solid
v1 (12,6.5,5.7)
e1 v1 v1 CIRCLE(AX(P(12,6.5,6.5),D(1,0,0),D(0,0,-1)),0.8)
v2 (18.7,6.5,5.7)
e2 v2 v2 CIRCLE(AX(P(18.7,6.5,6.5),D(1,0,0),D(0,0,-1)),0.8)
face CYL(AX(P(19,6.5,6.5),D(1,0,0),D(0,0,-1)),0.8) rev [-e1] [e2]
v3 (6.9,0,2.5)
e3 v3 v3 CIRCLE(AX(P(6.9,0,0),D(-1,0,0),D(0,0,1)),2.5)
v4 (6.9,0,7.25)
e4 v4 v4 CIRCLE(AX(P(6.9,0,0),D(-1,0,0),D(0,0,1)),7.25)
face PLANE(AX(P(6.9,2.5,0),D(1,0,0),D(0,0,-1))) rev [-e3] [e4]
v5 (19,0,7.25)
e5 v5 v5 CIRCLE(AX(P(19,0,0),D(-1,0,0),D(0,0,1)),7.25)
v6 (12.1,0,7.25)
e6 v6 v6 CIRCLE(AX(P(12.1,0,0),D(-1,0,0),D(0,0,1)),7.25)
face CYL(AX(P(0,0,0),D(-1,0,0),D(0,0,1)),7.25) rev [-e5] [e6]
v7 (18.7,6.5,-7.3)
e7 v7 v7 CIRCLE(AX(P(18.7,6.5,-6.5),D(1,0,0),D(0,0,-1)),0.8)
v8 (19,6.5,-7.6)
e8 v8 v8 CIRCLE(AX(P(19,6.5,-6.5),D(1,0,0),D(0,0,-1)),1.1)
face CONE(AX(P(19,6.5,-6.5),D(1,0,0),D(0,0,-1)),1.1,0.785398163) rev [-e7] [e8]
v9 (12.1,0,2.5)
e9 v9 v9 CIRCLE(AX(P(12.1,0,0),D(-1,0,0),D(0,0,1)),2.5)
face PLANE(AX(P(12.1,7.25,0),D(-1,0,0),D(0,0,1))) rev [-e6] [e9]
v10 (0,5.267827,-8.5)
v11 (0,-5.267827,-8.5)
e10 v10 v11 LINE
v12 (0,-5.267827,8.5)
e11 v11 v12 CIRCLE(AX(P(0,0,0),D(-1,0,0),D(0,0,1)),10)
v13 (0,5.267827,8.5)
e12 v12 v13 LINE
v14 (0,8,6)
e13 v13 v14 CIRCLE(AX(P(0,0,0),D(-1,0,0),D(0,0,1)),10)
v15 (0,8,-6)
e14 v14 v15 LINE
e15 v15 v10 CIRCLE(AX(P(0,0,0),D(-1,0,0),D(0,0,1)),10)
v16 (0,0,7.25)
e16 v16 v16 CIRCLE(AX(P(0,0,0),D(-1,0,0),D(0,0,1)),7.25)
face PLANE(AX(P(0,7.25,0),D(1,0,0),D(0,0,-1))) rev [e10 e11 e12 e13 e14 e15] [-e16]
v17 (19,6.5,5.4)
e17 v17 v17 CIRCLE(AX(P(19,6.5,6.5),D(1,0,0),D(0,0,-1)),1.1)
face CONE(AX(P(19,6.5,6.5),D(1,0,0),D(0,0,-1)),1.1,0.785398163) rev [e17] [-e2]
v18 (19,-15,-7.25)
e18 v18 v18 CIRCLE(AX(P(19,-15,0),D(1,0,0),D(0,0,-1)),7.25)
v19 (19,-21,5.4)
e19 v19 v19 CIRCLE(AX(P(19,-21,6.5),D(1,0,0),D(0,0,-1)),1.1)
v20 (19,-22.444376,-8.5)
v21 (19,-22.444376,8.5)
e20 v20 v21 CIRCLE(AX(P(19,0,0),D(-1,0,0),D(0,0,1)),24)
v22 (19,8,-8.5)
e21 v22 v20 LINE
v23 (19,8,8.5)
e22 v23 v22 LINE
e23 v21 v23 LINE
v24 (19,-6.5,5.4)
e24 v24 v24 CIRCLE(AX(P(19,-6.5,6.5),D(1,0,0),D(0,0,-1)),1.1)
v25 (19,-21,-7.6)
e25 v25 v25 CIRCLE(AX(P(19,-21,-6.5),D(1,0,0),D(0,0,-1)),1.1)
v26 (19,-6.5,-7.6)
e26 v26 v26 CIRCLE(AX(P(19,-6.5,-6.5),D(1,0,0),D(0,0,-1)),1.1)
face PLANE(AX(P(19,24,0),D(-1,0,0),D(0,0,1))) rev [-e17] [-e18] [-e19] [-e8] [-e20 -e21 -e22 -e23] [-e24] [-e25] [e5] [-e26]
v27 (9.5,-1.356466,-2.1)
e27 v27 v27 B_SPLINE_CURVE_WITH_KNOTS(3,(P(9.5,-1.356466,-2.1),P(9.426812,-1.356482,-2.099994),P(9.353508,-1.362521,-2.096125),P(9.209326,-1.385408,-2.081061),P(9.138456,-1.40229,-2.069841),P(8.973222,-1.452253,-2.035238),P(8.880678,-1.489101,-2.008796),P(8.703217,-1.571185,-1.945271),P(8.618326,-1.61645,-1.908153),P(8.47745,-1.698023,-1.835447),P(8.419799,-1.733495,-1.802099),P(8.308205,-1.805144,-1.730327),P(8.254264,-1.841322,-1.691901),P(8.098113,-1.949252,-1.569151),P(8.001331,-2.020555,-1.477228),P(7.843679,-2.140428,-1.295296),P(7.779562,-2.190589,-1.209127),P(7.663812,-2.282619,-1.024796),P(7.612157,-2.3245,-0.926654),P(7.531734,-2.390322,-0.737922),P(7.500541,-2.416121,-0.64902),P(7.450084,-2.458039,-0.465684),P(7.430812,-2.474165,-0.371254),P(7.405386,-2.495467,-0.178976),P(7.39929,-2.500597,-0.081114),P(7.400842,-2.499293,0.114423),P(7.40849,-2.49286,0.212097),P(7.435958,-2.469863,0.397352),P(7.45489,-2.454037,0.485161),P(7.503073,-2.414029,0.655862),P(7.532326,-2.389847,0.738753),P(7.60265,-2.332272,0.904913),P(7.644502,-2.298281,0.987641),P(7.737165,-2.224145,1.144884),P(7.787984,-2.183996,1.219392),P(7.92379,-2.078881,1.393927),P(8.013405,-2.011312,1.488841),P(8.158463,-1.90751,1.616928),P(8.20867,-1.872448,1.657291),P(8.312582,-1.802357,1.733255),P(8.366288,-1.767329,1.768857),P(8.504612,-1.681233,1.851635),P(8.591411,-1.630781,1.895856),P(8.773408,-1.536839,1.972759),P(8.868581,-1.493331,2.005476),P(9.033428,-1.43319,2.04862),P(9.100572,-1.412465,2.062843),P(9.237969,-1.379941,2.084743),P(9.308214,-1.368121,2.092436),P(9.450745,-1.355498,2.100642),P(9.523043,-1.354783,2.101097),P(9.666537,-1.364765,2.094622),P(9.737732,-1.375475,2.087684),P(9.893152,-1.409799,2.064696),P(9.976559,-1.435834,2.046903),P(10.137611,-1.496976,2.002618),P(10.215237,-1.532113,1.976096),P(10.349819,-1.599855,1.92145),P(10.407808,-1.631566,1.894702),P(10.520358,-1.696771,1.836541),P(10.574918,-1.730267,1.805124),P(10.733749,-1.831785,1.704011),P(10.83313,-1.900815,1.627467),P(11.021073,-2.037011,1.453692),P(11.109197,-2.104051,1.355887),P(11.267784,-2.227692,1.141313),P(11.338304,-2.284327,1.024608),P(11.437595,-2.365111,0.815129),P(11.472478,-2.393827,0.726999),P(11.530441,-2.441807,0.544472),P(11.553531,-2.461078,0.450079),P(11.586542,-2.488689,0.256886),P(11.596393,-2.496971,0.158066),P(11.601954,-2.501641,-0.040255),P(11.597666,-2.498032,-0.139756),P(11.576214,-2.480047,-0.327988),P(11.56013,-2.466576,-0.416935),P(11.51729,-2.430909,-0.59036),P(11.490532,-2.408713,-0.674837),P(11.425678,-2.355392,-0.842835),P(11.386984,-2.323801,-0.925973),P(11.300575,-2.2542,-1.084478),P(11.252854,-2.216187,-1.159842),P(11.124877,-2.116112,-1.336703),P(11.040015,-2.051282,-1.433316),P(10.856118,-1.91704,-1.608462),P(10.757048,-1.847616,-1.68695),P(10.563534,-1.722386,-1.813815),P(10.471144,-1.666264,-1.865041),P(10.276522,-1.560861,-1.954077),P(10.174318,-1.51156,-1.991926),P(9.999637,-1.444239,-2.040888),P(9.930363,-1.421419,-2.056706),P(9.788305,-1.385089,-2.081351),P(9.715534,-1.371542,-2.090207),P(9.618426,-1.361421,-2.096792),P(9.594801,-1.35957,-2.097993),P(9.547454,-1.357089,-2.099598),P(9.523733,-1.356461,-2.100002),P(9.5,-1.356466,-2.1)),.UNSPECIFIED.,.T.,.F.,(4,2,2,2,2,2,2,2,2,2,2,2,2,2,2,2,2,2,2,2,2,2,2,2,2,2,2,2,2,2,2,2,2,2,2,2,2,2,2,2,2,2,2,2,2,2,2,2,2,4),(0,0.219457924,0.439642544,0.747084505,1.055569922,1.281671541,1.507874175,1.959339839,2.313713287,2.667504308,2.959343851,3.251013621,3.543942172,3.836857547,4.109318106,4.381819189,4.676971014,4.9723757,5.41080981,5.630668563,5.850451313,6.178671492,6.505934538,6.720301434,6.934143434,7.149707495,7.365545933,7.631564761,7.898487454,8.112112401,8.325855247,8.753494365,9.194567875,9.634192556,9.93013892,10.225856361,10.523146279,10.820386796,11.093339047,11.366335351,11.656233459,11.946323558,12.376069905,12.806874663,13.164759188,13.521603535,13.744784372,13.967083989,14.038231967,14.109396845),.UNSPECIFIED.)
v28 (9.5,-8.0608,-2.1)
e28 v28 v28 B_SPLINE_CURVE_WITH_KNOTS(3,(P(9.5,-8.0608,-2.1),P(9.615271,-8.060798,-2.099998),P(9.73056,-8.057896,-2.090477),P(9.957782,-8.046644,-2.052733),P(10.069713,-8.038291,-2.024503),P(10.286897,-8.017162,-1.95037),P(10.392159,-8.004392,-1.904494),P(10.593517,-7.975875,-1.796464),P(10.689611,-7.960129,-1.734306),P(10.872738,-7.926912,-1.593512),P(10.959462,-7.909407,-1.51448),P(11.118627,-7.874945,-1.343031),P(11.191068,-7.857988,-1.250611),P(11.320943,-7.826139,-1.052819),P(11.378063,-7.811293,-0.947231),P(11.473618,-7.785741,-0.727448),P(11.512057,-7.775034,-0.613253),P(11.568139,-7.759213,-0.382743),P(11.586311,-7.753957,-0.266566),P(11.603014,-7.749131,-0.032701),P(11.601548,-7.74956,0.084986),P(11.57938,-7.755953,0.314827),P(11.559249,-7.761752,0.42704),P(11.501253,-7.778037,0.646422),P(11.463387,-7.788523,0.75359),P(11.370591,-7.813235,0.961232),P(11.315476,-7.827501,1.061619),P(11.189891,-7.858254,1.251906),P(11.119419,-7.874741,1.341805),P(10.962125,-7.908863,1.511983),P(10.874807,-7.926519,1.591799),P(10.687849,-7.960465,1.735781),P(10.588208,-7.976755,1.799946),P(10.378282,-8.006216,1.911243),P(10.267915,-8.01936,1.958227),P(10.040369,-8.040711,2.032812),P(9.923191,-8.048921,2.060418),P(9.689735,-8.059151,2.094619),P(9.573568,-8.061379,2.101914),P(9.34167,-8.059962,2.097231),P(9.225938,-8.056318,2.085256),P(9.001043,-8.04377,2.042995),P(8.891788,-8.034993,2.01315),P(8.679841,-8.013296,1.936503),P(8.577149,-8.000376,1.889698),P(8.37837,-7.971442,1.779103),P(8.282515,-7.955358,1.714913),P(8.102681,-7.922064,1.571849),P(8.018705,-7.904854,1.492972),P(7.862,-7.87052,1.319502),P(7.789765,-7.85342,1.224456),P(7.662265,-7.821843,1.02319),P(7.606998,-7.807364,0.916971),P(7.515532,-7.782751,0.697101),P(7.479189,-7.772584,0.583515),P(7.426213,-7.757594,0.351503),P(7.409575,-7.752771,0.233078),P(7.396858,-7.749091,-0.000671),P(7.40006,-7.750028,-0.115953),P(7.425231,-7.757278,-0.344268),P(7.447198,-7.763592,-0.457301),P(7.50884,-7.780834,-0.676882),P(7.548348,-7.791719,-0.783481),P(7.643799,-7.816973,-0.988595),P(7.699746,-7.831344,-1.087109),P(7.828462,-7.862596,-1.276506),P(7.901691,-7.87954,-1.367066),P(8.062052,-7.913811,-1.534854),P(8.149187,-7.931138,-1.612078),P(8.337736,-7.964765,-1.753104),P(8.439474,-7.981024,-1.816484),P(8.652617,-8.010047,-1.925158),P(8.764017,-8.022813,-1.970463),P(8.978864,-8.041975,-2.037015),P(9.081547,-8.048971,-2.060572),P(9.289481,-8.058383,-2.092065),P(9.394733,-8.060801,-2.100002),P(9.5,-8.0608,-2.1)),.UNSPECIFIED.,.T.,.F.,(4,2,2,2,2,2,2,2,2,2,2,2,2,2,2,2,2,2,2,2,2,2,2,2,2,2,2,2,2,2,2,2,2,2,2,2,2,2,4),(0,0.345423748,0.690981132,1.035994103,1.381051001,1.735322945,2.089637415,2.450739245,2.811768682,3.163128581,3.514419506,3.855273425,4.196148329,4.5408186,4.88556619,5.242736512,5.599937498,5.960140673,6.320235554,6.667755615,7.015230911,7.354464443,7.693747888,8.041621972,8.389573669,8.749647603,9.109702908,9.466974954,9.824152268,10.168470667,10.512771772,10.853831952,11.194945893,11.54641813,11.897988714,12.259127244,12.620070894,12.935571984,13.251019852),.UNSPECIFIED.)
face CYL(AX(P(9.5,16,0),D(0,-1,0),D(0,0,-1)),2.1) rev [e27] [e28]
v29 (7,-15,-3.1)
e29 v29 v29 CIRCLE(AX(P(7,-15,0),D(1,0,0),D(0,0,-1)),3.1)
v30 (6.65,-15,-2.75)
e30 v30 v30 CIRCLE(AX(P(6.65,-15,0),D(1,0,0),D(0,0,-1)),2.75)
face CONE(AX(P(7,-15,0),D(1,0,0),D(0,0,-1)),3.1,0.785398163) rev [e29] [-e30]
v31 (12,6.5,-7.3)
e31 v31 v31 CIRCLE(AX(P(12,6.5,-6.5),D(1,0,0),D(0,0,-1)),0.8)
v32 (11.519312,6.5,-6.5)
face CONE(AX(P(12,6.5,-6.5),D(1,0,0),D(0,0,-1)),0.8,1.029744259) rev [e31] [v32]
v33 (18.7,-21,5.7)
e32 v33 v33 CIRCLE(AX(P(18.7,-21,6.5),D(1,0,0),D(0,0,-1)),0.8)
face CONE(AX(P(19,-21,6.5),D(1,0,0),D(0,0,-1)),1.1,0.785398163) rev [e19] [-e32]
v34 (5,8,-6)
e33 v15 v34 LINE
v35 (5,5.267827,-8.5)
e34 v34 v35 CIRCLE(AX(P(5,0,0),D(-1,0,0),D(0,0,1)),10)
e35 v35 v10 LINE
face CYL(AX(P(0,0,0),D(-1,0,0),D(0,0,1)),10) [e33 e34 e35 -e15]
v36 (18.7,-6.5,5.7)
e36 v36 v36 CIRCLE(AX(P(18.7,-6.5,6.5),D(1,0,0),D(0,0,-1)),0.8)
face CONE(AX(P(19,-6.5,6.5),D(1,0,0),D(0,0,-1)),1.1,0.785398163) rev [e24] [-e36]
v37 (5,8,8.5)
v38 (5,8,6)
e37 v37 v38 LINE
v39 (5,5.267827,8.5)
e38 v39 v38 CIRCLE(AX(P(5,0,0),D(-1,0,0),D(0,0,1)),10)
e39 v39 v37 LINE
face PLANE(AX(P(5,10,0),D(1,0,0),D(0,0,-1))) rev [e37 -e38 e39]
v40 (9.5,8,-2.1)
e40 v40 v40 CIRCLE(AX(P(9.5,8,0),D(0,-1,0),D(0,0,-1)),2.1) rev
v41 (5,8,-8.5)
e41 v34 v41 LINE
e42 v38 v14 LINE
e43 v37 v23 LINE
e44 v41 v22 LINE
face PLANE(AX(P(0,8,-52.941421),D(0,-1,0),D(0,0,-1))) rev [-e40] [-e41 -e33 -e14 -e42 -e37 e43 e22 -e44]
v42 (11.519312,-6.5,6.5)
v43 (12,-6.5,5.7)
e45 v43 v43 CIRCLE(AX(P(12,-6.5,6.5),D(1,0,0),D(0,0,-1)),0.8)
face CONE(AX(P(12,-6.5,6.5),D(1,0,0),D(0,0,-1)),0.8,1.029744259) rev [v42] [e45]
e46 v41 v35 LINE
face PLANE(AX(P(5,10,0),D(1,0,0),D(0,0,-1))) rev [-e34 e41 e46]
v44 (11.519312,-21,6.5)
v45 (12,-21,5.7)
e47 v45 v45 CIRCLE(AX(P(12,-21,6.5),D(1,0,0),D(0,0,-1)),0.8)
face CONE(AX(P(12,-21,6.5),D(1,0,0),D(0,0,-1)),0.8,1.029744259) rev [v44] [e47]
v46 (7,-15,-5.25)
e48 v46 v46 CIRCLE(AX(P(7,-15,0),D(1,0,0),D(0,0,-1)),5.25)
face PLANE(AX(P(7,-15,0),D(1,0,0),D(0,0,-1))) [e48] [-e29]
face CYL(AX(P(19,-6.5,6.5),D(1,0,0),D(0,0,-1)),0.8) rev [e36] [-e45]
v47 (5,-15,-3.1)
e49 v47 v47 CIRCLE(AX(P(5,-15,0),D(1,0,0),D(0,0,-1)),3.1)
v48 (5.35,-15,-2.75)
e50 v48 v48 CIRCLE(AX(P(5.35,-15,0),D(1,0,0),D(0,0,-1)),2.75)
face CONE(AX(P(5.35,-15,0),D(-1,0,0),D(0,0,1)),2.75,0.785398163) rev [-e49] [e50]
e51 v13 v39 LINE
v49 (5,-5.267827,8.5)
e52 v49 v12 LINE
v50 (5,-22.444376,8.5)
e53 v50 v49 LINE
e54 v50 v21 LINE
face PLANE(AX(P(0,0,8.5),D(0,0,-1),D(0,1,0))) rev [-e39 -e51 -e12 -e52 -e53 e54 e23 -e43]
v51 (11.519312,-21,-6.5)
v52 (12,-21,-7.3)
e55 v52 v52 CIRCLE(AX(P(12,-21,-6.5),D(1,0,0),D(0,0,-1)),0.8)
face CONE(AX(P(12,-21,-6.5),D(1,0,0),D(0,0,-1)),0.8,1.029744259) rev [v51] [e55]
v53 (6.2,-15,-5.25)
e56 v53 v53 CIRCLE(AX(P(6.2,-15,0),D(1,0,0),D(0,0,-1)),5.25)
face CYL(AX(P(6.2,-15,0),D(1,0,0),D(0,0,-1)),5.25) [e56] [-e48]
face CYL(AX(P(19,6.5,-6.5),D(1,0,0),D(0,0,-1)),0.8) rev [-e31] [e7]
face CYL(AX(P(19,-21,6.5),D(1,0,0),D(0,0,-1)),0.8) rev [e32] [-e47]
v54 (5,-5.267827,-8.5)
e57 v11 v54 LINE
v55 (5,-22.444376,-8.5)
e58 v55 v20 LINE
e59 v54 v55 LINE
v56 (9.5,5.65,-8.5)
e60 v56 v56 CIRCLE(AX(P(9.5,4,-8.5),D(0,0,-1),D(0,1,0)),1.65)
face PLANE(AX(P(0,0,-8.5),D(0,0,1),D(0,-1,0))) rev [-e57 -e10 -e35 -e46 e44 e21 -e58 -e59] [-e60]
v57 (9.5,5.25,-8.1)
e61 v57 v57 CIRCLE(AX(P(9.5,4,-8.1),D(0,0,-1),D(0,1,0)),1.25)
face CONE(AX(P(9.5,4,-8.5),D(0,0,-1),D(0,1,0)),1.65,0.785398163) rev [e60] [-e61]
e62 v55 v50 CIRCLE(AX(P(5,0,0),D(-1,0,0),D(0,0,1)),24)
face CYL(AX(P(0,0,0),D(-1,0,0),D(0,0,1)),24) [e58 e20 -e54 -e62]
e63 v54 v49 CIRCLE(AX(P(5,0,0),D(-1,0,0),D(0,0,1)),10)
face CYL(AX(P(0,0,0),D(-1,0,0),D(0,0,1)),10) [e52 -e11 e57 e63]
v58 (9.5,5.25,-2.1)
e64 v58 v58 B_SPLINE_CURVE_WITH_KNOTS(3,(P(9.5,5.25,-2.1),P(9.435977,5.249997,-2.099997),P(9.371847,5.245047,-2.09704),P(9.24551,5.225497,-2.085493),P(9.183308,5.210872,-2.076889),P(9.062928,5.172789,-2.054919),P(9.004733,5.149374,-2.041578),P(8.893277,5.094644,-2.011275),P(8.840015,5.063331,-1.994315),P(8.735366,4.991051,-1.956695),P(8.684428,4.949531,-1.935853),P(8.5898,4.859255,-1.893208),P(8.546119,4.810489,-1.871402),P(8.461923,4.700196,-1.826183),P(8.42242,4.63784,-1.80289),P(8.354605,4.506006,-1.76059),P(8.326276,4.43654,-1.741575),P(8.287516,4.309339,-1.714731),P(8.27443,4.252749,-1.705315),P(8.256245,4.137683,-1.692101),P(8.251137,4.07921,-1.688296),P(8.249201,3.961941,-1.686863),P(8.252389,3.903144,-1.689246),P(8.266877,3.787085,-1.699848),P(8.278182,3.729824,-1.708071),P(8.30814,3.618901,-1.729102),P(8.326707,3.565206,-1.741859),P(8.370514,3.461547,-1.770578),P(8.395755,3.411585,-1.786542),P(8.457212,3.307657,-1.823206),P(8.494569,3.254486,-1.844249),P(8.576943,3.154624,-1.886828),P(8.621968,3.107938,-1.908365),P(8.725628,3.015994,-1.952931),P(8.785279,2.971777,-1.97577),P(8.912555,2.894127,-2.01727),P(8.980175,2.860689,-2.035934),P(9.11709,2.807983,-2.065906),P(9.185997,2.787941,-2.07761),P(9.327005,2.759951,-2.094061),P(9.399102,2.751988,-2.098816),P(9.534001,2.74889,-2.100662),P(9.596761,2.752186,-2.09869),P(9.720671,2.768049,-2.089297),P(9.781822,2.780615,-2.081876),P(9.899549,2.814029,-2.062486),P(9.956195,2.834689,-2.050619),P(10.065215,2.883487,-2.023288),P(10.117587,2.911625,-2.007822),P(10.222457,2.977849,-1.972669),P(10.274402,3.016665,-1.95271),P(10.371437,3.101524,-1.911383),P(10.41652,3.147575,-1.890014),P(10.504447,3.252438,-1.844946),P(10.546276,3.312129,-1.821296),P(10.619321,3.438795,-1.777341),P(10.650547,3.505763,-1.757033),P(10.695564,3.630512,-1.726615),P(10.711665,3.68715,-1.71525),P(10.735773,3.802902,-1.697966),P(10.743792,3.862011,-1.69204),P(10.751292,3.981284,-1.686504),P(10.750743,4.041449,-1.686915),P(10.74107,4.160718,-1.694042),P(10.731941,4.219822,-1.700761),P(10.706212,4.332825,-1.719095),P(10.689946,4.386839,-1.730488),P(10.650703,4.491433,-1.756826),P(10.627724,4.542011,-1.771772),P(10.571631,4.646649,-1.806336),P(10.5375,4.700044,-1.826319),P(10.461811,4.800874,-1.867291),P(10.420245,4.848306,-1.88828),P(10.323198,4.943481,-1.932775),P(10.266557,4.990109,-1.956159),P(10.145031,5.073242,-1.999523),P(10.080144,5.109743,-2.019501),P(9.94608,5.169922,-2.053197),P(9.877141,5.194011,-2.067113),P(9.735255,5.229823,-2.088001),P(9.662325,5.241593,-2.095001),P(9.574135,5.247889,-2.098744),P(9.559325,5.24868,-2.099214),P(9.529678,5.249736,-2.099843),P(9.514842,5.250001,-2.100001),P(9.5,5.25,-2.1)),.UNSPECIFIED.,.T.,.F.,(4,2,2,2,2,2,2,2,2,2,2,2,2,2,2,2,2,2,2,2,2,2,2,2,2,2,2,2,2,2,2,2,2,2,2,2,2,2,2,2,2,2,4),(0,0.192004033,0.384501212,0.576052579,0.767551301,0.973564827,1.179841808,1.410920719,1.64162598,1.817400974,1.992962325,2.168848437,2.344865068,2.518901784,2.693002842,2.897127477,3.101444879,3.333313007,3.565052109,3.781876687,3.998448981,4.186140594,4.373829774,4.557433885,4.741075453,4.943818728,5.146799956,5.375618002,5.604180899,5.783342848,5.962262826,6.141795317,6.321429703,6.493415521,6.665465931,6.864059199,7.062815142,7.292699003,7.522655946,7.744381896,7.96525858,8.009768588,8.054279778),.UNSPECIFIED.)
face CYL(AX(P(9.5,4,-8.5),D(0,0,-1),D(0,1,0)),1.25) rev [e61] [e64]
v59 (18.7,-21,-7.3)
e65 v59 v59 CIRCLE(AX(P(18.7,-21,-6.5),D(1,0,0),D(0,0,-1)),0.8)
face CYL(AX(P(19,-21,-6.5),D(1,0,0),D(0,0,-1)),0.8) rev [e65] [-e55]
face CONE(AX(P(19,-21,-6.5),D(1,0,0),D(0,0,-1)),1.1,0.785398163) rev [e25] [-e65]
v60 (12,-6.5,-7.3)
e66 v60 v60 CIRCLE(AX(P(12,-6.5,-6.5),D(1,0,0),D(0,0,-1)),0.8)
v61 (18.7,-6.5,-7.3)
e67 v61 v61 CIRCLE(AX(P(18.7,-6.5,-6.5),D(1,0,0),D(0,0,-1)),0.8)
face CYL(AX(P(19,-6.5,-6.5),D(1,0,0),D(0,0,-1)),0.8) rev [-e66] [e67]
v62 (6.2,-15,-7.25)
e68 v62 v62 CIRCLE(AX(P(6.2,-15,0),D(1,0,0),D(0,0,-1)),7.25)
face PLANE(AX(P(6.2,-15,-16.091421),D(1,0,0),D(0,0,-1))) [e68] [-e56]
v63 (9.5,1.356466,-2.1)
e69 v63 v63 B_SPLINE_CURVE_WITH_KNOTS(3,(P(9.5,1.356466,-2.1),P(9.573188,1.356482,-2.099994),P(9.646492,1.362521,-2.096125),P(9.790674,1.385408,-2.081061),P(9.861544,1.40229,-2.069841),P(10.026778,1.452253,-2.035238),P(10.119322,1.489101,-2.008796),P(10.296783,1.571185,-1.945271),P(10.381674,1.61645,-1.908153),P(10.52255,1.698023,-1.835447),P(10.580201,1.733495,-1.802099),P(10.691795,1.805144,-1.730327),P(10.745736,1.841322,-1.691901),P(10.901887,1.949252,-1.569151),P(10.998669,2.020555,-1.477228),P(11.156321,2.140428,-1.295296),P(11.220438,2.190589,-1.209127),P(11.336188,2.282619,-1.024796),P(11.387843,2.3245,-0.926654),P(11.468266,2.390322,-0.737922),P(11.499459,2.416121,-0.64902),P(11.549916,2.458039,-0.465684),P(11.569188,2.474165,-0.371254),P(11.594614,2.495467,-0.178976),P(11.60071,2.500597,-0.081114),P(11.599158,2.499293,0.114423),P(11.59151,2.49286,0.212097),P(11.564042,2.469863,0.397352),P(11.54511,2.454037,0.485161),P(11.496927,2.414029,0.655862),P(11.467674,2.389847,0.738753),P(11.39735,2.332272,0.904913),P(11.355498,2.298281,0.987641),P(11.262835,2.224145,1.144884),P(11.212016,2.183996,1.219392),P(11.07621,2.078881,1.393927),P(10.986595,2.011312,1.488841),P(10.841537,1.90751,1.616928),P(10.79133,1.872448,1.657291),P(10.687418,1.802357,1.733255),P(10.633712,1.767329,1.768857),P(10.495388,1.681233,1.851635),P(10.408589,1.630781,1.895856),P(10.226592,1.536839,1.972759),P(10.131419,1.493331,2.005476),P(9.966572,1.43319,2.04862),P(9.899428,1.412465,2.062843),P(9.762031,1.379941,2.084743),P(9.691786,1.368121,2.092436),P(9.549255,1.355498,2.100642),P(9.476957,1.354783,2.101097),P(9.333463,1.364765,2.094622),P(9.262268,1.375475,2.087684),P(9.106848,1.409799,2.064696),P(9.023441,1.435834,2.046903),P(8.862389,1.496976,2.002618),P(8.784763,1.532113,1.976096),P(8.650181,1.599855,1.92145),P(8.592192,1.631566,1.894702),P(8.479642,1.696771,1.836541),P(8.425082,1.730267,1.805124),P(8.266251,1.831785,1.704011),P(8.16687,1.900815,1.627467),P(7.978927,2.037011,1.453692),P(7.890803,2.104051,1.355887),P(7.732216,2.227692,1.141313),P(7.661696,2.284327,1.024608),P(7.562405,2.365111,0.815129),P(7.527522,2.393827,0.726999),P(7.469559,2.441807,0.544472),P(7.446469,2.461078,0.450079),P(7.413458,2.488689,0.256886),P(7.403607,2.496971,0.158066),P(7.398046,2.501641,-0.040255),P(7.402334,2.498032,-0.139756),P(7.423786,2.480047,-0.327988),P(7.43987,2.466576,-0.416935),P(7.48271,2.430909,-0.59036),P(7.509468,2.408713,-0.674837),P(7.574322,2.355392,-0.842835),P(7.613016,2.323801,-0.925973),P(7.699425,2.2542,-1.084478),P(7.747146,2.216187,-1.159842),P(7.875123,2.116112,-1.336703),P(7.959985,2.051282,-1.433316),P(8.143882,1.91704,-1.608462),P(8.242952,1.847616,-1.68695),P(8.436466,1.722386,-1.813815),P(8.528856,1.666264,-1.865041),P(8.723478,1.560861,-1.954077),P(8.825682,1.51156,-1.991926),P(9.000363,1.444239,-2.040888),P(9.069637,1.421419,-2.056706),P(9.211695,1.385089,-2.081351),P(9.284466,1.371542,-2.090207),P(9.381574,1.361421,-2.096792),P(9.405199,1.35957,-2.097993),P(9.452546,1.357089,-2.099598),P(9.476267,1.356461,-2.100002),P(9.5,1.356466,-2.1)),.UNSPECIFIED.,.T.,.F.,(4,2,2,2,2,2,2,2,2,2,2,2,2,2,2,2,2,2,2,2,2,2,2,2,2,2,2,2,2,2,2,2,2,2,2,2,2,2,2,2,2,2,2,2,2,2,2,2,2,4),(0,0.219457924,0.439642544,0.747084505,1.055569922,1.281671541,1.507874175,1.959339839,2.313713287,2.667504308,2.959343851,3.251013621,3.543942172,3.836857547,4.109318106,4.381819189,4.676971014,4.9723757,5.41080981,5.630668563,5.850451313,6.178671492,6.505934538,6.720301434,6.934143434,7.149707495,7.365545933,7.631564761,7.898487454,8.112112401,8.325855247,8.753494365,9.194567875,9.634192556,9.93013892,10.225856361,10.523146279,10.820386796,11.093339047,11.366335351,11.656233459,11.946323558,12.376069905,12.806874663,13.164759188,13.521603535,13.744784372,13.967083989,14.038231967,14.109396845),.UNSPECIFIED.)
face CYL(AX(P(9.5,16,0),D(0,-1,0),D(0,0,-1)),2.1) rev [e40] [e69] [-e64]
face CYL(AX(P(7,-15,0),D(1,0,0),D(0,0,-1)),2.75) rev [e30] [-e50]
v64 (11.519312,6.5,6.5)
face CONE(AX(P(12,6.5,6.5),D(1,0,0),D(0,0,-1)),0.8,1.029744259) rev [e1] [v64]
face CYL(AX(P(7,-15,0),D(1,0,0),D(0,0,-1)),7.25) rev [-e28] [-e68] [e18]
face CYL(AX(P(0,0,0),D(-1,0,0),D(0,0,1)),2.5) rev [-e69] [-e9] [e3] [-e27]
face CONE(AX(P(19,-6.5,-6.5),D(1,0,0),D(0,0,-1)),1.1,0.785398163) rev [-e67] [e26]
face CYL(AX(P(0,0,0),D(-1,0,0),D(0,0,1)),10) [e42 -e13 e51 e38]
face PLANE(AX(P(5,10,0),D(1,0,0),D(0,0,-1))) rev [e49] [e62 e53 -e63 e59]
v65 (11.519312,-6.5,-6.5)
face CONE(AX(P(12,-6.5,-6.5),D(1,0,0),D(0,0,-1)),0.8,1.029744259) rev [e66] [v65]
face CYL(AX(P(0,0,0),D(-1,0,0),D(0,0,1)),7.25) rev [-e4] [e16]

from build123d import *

# Parameters (mm, degrees)
SKETCH_3_R               = 7.25
CUT_EXTRUDE_1_DEPTH      = 12
CUT_EXTRUDE_3_DEPTH      = 39.897300678
CUT_EXTRUDE_2_DEPTH      = 16
CUT_EXTRUDE_2_DEPTH_BACK = 10
SKETCH_4_R               = 2.1
M2X0_41_D                = 1.6
M2X0_41_DEPTH            = 7
M2X0_41_CSINK_D          = 2.2
M2X0_41_CSINK_ANGLE      = 90
M2X0_41_TIP              = 0.480688495
SKETCH_12_R              = 7.25
SKETCH_12_R_2            = 5.25
CUT_EXTRUDE_4_DEPTH      = 0.8


# Read off the part's stored shape, not the designer's step: Отверстие обработанное метчиком M3x0.51
with BuildPart() as part:
    # Эскиз2 → Повернуть1 (revolve)
    with BuildSketch(Plane.XY, mode=Mode.PRIVATE) as revolve_1_sk:
        Polygon((0, 10), (5, 10), (5, 24), (19, 24), (19, 7.25), (12.1, 7.25), (12.1, 2.5), (6.9, 2.5), (6.9, 7.25), (0, 7.25), align=None)
    revolve(revolve_1_sk.sketch.rotate(Axis((0, 0, 0), (1, 0, 0)), 90), axis=Axis((0, 0, 0), (1, 0, 0)))

    # Эскиз3 → Вырез-Вытянуть1 (cut)
    with BuildSketch(Plane(origin=(19, 0, 0), x_dir=(0, 0, -1), z_dir=(1, 0, 0))):
        with Locations((0, -15)):
            Circle(SKETCH_3_R)
    extrude(amount=-CUT_EXTRUDE_1_DEPTH, mode=Mode.SUBTRACT)

    # Эскиз5 → Вырез-Вытянуть3 (cut, through all)
    with BuildSketch(Plane(origin=(19, 0, 0), x_dir=(0, 0, -1), z_dir=(1, 0, 0))):
        with BuildLine():
            ThreePointArc((24, 0), (-13.638181697, 19.748417658), (-8.5, -22.444375687))
            Line((-8.5, -22.444375687), (-8.5, 8))
            Line((-8.5, 8), (8.5, 8))
            Line((8.5, 8), (8.5, -22.444375687))
            ThreePointArc((8.5, -22.444375687), (19.748417658, -13.638181697), (24, 0))
        make_face()
    extrude(amount=-CUT_EXTRUDE_3_DEPTH, mode=Mode.SUBTRACT)

    # Эскиз4 → Вырез-Вытянуть2 (cut, two sides: drawn at the far end of the back side and taken through both)
    with BuildSketch(Plane(origin=(0, 0, 0), x_dir=(1, 0, 0), z_dir=(0, 1, 0)).offset(-CUT_EXTRUDE_2_DEPTH_BACK)):
        with Locations(Location((9.5, 0, 0), (0, 0, 90))):
            Circle(SKETCH_4_R)
    extrude(amount=CUT_EXTRUDE_2_DEPTH + CUT_EXTRUDE_2_DEPTH_BACK, mode=Mode.SUBTRACT)

    # Отверстие обработанное метчиком M3x0.51 outline → Отверстие обработанное метчиком M3x0.51 (revolve, cut)
    with BuildSketch(Plane(origin=(9.5, 4, 0), x_dir=(1, 0, 0), z_dir=(0, -1, 0))):
        Polygon((1.25, -8.1), (1.25, -1.687245944), (0, -1.687245944), (0, -8.5), (1.65, -8.5), align=None)
    revolve(axis=Axis((9.5, 4, 0), (0, 0, 1)), mode=Mode.SUBTRACT)

    # Отверстие обработанное метчиком M2x0.41
    with Locations(Plane(origin=(19, 0, 0), x_dir=(0, 0, -1), z_dir=(1, 0, 0))):
        with Locations((-6.5, 6.5), (6.5, 6.5), (6.5, -6.5), (-6.5, -6.5), (-6.5, -21), (6.5, -21)):
            CounterSinkHole(M2X0_41_D / 2, M2X0_41_CSINK_D / 2, depth=M2X0_41_DEPTH, counter_sink_angle=M2X0_41_CSINK_ANGLE)
            with Locations((0, 0, -(M2X0_41_DEPTH + M2X0_41_TIP / 2))):  # 118° drill point
                Cone(0, M2X0_41_D / 2, M2X0_41_TIP, mode=Mode.SUBTRACT)

    # Эскиз12 → Вырез-Вытянуть4 (cut)
    with BuildSketch(Plane(origin=(7, 0, 0), x_dir=(0, 0, -1), z_dir=(1, 0, 0))):
        with Locations((0, -15)):
            Circle(SKETCH_12_R)
        with Locations((0, -15)):
            Circle(SKETCH_12_R_2, mode=Mode.SUBTRACT)
    extrude(amount=-CUT_EXTRUDE_4_DEPTH, mode=Mode.SUBTRACT)

    # Эскиз13 → Отверстие обработанное метчиком M6x0.51 (revolve, cut)
    with BuildSketch(Plane(origin=(7, -15, 0), x_dir=(0, 0, -1), z_dir=(0, 1, 0))):
        Polygon((0, 0), (0, 2), (3.1, 2), (2.75, 1.65), (2.75, 0.35), (3.1, 0), align=None)
    revolve(axis=Axis((13.35, -15, 0), (-1, 0, 0)), mode=Mode.SUBTRACT)


solid = part.part
